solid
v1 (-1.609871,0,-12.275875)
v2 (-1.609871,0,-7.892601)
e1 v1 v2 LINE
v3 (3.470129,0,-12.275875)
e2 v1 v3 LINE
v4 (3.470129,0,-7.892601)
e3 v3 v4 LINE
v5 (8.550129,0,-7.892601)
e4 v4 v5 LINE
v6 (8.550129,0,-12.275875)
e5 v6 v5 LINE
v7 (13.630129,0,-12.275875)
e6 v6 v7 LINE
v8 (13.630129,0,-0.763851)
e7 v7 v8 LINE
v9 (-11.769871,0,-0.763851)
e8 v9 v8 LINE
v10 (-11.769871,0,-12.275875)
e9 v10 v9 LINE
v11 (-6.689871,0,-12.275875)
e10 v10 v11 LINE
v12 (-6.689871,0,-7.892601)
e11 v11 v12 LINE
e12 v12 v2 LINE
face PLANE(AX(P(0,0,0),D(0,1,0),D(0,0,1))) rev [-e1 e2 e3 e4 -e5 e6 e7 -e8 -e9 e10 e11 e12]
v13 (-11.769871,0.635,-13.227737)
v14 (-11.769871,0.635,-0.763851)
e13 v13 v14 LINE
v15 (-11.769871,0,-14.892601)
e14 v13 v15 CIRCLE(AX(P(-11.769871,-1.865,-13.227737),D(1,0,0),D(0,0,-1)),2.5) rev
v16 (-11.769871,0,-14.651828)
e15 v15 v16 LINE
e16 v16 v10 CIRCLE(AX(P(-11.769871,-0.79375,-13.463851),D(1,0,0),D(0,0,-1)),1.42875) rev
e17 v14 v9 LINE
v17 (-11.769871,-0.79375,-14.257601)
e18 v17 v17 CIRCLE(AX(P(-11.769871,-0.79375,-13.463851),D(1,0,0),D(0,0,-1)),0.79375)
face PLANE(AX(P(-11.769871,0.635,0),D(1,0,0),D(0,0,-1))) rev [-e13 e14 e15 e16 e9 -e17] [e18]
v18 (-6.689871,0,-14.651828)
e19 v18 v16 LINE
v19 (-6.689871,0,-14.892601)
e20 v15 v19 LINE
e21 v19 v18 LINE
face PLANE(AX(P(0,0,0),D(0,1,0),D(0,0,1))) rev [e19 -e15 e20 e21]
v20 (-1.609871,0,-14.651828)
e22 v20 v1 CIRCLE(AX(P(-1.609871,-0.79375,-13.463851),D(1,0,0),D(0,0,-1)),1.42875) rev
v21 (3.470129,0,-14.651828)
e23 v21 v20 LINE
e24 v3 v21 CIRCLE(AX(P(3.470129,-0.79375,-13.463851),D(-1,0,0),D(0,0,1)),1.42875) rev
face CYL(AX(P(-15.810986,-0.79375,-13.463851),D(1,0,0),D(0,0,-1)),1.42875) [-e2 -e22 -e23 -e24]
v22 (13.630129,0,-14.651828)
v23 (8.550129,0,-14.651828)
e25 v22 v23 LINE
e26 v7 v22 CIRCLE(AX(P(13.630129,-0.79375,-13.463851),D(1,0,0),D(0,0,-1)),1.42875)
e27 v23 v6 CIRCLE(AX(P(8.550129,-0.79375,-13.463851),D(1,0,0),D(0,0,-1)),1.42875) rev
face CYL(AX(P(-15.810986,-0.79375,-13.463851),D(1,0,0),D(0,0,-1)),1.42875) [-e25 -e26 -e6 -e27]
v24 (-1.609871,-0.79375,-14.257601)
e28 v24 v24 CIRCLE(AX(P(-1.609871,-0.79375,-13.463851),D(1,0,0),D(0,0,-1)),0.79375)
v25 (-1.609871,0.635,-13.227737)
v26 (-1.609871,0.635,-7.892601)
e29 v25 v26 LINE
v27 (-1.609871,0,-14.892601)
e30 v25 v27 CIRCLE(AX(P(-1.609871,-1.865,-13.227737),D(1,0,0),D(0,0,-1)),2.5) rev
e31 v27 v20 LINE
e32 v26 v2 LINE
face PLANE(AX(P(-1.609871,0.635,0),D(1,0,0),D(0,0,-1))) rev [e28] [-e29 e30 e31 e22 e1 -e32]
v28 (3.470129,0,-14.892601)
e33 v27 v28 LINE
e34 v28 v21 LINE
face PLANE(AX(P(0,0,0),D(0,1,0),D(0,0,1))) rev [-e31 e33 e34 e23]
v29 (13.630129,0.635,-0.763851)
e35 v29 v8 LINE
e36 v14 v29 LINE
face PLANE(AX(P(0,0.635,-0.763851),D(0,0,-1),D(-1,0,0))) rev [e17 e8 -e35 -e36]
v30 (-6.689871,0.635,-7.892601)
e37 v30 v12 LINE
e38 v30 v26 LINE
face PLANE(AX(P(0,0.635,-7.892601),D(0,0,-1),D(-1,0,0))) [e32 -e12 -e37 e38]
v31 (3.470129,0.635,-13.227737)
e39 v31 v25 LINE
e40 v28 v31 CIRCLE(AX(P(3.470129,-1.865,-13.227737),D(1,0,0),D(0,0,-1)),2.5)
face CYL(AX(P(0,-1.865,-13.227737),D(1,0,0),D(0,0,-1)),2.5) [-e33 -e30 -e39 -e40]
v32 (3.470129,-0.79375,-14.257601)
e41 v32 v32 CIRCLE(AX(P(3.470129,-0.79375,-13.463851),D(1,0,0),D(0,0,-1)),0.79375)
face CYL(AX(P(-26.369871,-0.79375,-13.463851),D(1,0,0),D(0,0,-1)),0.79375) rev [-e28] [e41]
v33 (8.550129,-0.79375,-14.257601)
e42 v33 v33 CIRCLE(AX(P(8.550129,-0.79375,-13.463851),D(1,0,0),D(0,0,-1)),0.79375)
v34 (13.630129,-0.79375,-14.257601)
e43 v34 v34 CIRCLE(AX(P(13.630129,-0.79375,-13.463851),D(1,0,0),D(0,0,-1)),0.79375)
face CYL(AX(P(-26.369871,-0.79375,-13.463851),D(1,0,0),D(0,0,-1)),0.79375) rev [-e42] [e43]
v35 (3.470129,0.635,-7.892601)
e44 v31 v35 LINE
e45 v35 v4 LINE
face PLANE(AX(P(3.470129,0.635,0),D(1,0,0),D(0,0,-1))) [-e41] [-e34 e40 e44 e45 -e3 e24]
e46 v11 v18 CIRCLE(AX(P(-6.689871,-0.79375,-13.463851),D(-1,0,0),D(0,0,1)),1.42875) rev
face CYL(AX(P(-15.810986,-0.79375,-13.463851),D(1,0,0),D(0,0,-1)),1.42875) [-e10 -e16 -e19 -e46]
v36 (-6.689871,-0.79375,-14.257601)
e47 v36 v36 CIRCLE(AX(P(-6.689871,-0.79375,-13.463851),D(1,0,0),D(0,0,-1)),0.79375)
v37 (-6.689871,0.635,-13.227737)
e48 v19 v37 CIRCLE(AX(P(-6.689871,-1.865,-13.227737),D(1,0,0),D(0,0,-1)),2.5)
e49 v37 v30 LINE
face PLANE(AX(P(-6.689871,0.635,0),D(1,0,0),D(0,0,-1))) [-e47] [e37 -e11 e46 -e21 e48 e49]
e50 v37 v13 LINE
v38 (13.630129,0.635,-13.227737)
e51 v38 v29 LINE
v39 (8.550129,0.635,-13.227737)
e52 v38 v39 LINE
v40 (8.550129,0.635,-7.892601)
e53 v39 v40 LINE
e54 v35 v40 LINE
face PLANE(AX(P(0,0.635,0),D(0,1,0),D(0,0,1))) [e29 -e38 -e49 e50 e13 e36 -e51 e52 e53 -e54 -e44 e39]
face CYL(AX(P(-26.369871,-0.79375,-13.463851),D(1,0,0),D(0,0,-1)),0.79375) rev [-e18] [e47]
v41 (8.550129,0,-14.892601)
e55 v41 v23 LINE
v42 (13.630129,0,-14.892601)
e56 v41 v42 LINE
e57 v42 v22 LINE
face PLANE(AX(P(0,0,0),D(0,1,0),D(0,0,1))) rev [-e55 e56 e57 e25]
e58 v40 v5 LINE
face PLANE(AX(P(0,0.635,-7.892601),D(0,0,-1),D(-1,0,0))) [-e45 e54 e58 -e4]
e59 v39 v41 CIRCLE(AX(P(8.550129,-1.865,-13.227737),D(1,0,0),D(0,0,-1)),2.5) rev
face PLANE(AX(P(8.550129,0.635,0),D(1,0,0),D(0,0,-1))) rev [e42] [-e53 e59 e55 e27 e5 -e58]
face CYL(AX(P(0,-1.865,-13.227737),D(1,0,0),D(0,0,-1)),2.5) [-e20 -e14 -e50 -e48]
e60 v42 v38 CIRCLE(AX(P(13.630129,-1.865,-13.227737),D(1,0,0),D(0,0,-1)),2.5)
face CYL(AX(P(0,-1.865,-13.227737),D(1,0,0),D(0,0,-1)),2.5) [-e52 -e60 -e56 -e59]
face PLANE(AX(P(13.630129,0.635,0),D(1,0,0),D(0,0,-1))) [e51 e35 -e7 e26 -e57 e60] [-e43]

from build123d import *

# Parameters (mm, degrees)
BOSS_EXTRUDE1_DEPTH = 0.635
BOSS_EXTRUDE2_REACH = 31.451
SKETCH2_R           = 1.42875
SKETCH3_W           = 5.08
SKETCH3_H           = 7
CUT_EXTRUDE1_DEPTH  = 40
SKETCH4_R           = 0.79375
CUT_EXTRUDE2_DEPTH  = 40
FILLET1_R           = 2.5


with BuildPart() as part:
    # Sketch1 → Boss-Extrude1 (new body)
    with BuildSketch(Plane(origin=(0, 0, 0), x_dir=(1, 0, 0), z_dir=(0, 1, 0))):
        Polygon((-6.689871172, 14.89260144), (-11.769871172, 14.89260144), (-11.769871172, 0.76385144), (13.630128828, 0.76385144), (13.630128828, 14.89260144), (8.550128828, 14.89260144), (8.550128828, 7.89260144), (3.470128828, 7.89260144), (3.470128828, 14.89260144), (-1.609871172, 14.89260144), (-1.609871172, 7.89260144), (-6.689871172, 7.89260144), align=None)
    extrude(amount=BOSS_EXTRUDE1_DEPTH)

    # Boss-Extrude2: up to this face of the body (flat: up to its plane)
    boss_extrude2_end = Plane(part.part.faces().sort_by_distance((-11.769871172, 0.3175, -7.82822644))[0])
    # Sketch2 → Boss-Extrude2 (add, up to the picked face)
    with BuildSketch(Plane(origin=(13.630128828, 0, 0), x_dir=(0, 0, -1), z_dir=(1, 0, 0)), mode=Mode.PRIVATE) as boss_extrude2_sk1:
        with Locations(Location((13.46385144, -0.79375, 0), (0, 0, 33.748988596))):
            Circle(SKETCH2_R)
    boss_extrude2_tool1 = split(extrude(boss_extrude2_sk1.sketch, amount=-BOSS_EXTRUDE2_REACH, mode=Mode.PRIVATE), bisect_by=boss_extrude2_end, keep=Keep.BOTH, mode=Mode.PRIVATE)
    add(boss_extrude2_tool1.solids().sort_by(Axis((13.630129, -0.79375, -13.463851), (-1, 0, 0)))[0])

    # Sketch3 → Cut-Extrude1 (cut)
    with BuildSketch(Plane(origin=(0, 0.635, 0), x_dir=(1, 0, 0), z_dir=(0, 1, 0))):
        with Locations((-4.149871172, 11.39260144)):
            Rectangle(SKETCH3_W, SKETCH3_H)
        with Locations((6.010128828, 11.39260144)):
            Rectangle(SKETCH3_W, SKETCH3_H)
    extrude(amount=-CUT_EXTRUDE1_DEPTH, mode=Mode.SUBTRACT)

    # Sketch4 → Cut-Extrude2 (cut)
    with BuildSketch(Plane(origin=(13.630128828, 0, 0), x_dir=(0, 0, -1), z_dir=(1, 0, 0))):
        with Locations((13.46385144, -0.79375)):
            Circle(SKETCH4_R)
    extrude(amount=-CUT_EXTRUDE2_DEPTH, mode=Mode.SUBTRACT)

    # Fillet1
    # the kernel refuses this fillet: 2.5 mm, written as the material it takes off along each edge
    with BuildSketch(Plane(origin=(-2.527709024, 0.635, -14.89260144), x_dir=(0, 0, 1), z_dir=(-1, 0, 0)), Plane(origin=(7.632290976, 0.635, -14.89260144), x_dir=(0, 0, 1), z_dir=(-1, 0, 0))) as fillet1_piece_1:
        with BuildLine():
            CenterArc((1.664864859, -2.5), FILLET1_R, 90, 41.754936598)
            Line((0, -0.635), (-0.033297297, -0.5977))
            ThreePointArc((-0.033297297, -0.5977), (-0.05, -0.3175), (-0.05, 0))
            Line((-0.05, 0), (0, 0.05))
            Line((0, 0.05), (1.664864859, 0.05))
            Line((1.664864859, 0.05), (1.664864859, 0))
        make_face()
    extrude(amount=13.404324297, mode=Mode.SUBTRACT)
    with BuildSketch(Plane(origin=(17.792290976, 0.635, -14.89260144), x_dir=(0, -1, 0), z_dir=(-1, 0, 0))) as fillet1_piece_2:
        with BuildLine():
            CenterArc((2.5, 1.664864859), FILLET1_R, 180, 41.754936598)
            Line((0, 1.664864859), (-0.05, 1.664864859))
            Line((-0.05, 1.664864859), (-0.05, 0))
            Line((-0.05, 0), (0, -0.05))
            ThreePointArc((0, -0.05), (0.3175, -0.05), (0.5977, -0.033297297))
            Line((0.5977, -0.033297297), (0.635, 0))
        make_face()
    extrude(amount=13.404324297, mode=Mode.SUBTRACT)


solid = part.part
